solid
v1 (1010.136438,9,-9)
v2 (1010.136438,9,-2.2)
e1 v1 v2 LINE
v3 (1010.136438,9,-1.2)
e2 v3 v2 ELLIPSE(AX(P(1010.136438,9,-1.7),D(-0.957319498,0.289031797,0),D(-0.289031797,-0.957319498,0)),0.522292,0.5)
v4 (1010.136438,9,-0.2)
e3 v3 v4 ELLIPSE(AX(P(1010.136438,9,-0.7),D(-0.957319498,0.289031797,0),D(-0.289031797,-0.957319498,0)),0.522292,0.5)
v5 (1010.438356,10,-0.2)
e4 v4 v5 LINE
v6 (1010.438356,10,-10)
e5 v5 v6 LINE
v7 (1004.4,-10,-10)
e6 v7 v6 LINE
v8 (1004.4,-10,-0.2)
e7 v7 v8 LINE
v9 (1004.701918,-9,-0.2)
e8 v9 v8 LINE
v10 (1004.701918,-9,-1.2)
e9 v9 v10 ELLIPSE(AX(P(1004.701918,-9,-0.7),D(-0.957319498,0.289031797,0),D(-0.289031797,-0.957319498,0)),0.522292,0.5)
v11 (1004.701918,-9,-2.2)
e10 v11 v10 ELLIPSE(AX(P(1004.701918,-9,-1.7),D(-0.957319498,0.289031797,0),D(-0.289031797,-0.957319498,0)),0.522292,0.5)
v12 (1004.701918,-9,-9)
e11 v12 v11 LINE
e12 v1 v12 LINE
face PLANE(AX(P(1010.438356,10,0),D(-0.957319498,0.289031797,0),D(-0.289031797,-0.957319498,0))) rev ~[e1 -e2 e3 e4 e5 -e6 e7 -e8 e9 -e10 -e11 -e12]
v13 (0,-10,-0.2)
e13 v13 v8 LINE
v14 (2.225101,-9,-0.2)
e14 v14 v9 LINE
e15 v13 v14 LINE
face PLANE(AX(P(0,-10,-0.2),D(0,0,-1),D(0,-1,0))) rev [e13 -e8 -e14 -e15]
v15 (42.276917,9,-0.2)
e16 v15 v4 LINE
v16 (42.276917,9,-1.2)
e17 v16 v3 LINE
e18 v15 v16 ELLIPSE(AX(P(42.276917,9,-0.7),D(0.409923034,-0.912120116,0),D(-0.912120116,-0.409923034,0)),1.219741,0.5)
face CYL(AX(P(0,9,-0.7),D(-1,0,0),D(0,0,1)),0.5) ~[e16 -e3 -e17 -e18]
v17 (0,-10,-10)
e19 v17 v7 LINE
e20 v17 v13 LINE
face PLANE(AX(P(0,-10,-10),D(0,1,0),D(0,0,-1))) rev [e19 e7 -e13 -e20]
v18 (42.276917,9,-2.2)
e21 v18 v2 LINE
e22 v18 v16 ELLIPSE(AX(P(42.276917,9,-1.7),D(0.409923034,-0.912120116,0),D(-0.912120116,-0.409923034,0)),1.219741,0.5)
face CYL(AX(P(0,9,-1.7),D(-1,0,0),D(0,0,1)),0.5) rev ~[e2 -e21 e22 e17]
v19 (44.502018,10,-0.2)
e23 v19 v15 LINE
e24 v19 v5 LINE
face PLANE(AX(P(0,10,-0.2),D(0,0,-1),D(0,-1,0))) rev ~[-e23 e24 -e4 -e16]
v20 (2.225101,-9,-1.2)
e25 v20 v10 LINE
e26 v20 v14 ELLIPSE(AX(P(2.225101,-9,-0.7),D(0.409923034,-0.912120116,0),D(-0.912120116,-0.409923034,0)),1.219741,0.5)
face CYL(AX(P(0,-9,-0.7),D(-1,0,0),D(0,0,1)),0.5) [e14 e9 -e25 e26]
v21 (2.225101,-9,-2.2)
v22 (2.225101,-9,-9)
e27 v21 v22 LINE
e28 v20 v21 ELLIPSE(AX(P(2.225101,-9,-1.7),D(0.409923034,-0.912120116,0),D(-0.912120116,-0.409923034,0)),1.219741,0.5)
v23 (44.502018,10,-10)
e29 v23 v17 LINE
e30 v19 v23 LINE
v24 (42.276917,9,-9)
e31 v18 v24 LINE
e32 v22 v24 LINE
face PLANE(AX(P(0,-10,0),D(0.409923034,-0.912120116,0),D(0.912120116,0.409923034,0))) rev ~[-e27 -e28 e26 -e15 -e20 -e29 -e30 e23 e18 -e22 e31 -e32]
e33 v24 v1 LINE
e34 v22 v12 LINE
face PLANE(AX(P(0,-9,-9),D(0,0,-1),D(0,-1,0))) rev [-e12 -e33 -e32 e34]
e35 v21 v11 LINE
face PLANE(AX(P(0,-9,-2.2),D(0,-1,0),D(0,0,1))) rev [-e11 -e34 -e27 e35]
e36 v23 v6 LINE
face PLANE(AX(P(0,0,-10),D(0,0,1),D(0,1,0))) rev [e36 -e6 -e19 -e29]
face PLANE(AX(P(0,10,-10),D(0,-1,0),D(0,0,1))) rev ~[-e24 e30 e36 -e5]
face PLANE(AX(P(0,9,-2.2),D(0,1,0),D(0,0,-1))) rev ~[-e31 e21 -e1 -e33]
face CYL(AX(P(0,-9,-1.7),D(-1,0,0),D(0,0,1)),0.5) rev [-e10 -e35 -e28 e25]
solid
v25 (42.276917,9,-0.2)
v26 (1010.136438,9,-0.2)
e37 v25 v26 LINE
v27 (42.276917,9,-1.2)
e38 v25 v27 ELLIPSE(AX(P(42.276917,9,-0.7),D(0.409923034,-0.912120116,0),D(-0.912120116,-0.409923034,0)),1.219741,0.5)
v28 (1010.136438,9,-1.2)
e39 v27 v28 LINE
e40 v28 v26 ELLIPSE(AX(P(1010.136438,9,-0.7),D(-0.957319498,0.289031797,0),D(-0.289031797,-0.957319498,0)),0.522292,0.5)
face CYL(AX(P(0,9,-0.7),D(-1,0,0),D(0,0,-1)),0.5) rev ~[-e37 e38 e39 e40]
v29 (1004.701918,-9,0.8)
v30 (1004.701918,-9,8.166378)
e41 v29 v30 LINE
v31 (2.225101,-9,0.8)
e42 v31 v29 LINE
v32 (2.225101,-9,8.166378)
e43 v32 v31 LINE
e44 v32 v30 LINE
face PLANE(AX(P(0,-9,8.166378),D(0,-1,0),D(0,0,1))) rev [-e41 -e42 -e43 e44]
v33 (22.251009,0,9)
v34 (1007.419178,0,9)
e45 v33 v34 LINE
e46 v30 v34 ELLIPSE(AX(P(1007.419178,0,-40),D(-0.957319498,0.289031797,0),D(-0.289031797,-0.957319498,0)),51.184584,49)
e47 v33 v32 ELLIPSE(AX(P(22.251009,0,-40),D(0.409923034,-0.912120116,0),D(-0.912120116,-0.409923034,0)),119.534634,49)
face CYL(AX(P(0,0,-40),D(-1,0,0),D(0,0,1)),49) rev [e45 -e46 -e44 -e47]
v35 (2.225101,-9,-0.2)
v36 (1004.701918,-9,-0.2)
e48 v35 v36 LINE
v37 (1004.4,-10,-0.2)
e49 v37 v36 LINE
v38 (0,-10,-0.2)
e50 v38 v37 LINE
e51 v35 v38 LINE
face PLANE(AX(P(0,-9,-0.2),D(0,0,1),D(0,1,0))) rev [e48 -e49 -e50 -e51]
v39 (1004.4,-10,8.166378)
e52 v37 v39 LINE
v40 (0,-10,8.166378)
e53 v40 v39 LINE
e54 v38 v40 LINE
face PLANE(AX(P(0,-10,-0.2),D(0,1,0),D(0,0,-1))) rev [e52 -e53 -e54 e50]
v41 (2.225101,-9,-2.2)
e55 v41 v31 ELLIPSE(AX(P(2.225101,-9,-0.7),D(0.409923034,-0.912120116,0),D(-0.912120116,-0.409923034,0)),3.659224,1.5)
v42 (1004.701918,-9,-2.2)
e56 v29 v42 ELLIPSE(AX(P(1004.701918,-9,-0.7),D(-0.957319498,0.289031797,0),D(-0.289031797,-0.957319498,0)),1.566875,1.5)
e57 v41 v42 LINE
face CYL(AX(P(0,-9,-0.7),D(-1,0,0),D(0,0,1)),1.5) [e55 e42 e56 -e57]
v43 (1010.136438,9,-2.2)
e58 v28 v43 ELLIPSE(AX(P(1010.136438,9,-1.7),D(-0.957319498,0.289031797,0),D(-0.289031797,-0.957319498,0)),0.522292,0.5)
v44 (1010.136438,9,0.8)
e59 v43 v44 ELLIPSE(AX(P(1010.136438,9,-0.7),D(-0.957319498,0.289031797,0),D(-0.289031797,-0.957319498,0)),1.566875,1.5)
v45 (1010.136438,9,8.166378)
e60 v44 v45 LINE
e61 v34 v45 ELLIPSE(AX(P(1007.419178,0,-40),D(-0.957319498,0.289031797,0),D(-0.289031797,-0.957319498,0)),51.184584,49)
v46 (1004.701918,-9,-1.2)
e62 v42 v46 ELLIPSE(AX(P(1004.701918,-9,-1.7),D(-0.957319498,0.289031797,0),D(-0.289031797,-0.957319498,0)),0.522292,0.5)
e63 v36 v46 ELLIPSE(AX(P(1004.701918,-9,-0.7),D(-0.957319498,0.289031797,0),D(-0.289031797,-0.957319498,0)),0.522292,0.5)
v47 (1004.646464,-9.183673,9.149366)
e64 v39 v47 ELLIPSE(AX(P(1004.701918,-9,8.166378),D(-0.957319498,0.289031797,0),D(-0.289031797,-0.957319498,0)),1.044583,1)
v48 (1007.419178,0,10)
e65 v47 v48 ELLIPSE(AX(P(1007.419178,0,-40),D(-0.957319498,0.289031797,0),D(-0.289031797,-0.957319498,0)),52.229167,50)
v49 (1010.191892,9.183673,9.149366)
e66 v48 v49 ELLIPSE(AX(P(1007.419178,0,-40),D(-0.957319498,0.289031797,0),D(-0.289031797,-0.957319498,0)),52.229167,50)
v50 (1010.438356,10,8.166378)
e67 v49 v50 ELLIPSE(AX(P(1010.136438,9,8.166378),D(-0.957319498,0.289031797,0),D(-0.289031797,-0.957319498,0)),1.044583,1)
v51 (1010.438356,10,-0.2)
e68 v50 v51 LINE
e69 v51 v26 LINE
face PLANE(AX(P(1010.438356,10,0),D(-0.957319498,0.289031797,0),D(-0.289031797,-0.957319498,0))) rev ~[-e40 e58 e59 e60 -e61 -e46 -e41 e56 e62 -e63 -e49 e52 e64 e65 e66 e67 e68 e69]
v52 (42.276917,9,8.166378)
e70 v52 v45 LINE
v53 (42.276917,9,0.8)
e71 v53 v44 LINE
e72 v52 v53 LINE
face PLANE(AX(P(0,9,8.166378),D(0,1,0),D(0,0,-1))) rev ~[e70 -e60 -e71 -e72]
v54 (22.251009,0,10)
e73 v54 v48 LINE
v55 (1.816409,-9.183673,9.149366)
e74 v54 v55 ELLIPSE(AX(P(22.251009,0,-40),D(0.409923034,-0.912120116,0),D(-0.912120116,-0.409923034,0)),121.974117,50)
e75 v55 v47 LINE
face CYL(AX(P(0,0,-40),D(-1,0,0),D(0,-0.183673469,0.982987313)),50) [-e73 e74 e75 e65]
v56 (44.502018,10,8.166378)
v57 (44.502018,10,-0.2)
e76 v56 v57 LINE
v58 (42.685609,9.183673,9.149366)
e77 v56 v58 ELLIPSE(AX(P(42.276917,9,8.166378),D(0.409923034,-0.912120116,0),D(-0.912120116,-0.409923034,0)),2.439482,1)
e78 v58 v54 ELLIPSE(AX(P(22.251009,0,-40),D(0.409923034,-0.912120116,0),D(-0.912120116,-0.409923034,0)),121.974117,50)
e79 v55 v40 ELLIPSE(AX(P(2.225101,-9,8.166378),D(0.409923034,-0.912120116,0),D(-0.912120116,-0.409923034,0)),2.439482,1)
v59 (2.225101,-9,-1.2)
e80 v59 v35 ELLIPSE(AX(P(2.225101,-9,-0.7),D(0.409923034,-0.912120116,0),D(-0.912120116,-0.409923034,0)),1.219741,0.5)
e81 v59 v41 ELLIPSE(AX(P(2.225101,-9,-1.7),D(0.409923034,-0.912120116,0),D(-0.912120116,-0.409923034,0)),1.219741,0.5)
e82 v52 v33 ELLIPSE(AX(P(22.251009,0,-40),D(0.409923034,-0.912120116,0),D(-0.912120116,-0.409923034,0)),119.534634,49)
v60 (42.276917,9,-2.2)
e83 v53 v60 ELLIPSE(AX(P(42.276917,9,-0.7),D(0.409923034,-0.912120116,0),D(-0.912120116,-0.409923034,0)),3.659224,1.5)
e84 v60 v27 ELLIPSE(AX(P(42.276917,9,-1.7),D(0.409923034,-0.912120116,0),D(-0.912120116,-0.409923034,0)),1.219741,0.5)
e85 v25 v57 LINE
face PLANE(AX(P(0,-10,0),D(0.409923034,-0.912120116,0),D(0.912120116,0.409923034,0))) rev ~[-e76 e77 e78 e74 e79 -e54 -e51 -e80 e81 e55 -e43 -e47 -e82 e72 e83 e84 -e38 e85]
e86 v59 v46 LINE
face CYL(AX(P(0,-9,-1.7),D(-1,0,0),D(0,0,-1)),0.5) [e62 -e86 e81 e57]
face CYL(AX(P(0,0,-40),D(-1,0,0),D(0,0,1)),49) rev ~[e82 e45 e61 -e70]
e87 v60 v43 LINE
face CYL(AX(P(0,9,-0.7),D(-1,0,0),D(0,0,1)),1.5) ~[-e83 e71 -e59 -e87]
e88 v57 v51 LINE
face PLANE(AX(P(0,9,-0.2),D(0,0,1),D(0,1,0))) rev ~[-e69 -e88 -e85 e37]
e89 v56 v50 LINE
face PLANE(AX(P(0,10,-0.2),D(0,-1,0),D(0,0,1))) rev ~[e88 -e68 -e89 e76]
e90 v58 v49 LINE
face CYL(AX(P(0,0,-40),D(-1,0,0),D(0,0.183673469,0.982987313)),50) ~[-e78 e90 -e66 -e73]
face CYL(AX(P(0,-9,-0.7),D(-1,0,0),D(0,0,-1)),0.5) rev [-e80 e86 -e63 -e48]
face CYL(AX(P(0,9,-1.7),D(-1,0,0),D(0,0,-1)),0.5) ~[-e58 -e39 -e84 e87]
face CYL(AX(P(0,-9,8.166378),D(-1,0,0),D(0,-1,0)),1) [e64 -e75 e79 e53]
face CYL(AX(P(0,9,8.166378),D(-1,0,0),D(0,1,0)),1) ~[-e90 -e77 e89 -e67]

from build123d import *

# Parameters (mm, degrees)
F2_DEPTH      = 1200
F4_DEPTH      = 1200
F8_DEPTH      = 10.001
F8_DEPTH_BACK = 10.001


with BuildPart() as f2:
    # F1 (on Right) → F2 (new body)
    with BuildSketch(Plane.YZ):
        with BuildLine():
            Line((0, -9), (0, -10))
            Line((0, -10), (10, -10))
            Line((10, -10), (10, -0.2))
            Line((10, -0.2), (9, -0.2))
            ThreePointArc((9, -0.2), (8.5, -0.7), (9, -1.2))
            ThreePointArc((9, -1.2), (9.5, -1.7), (9, -2.2))
            Line((9, -2.2), (9, -9))
            Line((9, -9), (0, -9))
        make_face()
    extrude(amount=F2_DEPTH)

    # F5: F2 across plane


with BuildPart() as f4:
    # F3 (on Right) → F4 (new body)
    with BuildSketch(Plane.YZ):
        with BuildLine():
            Line((9, -0.2), (10, -0.2))
            Line((10, -0.2), (10, 8.1663783152))
            ThreePointArc((10, 8.1663783152), (9.7693092582, 8.8052548802), (9.1836734694, 9.1493656277))
            ThreePointArc((9.1836734694, 9.1493656277), (4.6114920912, 9.7868872364), (0, 10))
            Line((0, 10), (0, 9))
            ThreePointArc((0, 9), (4.5192622493, 8.7911494917), (9, 8.1663783152))
            Line((9, 8.1663783152), (9, 0.8))
            ThreePointArc((9, 0.8), (7.5, -0.7), (9, -2.2))
            ThreePointArc((9, -2.2), (9.5, -1.7), (9, -1.2))
            ThreePointArc((9, -1.2), (8.5, -0.7), (9, -0.2))
        make_face()
    extrude(amount=F4_DEPTH)

    # F6: F4 across plane


with BuildPart() as f2_1:
    add(f2.part)
    add(f2.part.mirror(Plane.XZ))


with BuildPart() as f4_1:
    add(f4.part)
    add(f4.part.mirror(Plane.XZ))


with BuildPart() as f8_tool:
    # F7 (on Top) → F8 (new body, two sides)
    with BuildSketch(Plane.XY) as f8_sk:
        Polygon((0, 10), (0, 0), (0, -10), (44.5020182264, 10), align=None)
        Polygon((1010.4383560074, 10), (1004.4, -10), (1208.0904245377, -10), (1208.0904245377, 10), align=None)
    extrude(amount=F8_DEPTH)
    extrude(f8_sk.sketch, amount=-F8_DEPTH_BACK)


with BuildPart() as f2_2:
    add(f2_1.part)

    # F8: cut by f8_tool
    add(f8_tool.part, mode=Mode.SUBTRACT)


with BuildPart() as f4_2:
    add(f4_1.part)

    # F8: cut by f8_tool
    add(f8_tool.part, mode=Mode.SUBTRACT)


solid = Compound([f2_2.part, f4_2.part])
